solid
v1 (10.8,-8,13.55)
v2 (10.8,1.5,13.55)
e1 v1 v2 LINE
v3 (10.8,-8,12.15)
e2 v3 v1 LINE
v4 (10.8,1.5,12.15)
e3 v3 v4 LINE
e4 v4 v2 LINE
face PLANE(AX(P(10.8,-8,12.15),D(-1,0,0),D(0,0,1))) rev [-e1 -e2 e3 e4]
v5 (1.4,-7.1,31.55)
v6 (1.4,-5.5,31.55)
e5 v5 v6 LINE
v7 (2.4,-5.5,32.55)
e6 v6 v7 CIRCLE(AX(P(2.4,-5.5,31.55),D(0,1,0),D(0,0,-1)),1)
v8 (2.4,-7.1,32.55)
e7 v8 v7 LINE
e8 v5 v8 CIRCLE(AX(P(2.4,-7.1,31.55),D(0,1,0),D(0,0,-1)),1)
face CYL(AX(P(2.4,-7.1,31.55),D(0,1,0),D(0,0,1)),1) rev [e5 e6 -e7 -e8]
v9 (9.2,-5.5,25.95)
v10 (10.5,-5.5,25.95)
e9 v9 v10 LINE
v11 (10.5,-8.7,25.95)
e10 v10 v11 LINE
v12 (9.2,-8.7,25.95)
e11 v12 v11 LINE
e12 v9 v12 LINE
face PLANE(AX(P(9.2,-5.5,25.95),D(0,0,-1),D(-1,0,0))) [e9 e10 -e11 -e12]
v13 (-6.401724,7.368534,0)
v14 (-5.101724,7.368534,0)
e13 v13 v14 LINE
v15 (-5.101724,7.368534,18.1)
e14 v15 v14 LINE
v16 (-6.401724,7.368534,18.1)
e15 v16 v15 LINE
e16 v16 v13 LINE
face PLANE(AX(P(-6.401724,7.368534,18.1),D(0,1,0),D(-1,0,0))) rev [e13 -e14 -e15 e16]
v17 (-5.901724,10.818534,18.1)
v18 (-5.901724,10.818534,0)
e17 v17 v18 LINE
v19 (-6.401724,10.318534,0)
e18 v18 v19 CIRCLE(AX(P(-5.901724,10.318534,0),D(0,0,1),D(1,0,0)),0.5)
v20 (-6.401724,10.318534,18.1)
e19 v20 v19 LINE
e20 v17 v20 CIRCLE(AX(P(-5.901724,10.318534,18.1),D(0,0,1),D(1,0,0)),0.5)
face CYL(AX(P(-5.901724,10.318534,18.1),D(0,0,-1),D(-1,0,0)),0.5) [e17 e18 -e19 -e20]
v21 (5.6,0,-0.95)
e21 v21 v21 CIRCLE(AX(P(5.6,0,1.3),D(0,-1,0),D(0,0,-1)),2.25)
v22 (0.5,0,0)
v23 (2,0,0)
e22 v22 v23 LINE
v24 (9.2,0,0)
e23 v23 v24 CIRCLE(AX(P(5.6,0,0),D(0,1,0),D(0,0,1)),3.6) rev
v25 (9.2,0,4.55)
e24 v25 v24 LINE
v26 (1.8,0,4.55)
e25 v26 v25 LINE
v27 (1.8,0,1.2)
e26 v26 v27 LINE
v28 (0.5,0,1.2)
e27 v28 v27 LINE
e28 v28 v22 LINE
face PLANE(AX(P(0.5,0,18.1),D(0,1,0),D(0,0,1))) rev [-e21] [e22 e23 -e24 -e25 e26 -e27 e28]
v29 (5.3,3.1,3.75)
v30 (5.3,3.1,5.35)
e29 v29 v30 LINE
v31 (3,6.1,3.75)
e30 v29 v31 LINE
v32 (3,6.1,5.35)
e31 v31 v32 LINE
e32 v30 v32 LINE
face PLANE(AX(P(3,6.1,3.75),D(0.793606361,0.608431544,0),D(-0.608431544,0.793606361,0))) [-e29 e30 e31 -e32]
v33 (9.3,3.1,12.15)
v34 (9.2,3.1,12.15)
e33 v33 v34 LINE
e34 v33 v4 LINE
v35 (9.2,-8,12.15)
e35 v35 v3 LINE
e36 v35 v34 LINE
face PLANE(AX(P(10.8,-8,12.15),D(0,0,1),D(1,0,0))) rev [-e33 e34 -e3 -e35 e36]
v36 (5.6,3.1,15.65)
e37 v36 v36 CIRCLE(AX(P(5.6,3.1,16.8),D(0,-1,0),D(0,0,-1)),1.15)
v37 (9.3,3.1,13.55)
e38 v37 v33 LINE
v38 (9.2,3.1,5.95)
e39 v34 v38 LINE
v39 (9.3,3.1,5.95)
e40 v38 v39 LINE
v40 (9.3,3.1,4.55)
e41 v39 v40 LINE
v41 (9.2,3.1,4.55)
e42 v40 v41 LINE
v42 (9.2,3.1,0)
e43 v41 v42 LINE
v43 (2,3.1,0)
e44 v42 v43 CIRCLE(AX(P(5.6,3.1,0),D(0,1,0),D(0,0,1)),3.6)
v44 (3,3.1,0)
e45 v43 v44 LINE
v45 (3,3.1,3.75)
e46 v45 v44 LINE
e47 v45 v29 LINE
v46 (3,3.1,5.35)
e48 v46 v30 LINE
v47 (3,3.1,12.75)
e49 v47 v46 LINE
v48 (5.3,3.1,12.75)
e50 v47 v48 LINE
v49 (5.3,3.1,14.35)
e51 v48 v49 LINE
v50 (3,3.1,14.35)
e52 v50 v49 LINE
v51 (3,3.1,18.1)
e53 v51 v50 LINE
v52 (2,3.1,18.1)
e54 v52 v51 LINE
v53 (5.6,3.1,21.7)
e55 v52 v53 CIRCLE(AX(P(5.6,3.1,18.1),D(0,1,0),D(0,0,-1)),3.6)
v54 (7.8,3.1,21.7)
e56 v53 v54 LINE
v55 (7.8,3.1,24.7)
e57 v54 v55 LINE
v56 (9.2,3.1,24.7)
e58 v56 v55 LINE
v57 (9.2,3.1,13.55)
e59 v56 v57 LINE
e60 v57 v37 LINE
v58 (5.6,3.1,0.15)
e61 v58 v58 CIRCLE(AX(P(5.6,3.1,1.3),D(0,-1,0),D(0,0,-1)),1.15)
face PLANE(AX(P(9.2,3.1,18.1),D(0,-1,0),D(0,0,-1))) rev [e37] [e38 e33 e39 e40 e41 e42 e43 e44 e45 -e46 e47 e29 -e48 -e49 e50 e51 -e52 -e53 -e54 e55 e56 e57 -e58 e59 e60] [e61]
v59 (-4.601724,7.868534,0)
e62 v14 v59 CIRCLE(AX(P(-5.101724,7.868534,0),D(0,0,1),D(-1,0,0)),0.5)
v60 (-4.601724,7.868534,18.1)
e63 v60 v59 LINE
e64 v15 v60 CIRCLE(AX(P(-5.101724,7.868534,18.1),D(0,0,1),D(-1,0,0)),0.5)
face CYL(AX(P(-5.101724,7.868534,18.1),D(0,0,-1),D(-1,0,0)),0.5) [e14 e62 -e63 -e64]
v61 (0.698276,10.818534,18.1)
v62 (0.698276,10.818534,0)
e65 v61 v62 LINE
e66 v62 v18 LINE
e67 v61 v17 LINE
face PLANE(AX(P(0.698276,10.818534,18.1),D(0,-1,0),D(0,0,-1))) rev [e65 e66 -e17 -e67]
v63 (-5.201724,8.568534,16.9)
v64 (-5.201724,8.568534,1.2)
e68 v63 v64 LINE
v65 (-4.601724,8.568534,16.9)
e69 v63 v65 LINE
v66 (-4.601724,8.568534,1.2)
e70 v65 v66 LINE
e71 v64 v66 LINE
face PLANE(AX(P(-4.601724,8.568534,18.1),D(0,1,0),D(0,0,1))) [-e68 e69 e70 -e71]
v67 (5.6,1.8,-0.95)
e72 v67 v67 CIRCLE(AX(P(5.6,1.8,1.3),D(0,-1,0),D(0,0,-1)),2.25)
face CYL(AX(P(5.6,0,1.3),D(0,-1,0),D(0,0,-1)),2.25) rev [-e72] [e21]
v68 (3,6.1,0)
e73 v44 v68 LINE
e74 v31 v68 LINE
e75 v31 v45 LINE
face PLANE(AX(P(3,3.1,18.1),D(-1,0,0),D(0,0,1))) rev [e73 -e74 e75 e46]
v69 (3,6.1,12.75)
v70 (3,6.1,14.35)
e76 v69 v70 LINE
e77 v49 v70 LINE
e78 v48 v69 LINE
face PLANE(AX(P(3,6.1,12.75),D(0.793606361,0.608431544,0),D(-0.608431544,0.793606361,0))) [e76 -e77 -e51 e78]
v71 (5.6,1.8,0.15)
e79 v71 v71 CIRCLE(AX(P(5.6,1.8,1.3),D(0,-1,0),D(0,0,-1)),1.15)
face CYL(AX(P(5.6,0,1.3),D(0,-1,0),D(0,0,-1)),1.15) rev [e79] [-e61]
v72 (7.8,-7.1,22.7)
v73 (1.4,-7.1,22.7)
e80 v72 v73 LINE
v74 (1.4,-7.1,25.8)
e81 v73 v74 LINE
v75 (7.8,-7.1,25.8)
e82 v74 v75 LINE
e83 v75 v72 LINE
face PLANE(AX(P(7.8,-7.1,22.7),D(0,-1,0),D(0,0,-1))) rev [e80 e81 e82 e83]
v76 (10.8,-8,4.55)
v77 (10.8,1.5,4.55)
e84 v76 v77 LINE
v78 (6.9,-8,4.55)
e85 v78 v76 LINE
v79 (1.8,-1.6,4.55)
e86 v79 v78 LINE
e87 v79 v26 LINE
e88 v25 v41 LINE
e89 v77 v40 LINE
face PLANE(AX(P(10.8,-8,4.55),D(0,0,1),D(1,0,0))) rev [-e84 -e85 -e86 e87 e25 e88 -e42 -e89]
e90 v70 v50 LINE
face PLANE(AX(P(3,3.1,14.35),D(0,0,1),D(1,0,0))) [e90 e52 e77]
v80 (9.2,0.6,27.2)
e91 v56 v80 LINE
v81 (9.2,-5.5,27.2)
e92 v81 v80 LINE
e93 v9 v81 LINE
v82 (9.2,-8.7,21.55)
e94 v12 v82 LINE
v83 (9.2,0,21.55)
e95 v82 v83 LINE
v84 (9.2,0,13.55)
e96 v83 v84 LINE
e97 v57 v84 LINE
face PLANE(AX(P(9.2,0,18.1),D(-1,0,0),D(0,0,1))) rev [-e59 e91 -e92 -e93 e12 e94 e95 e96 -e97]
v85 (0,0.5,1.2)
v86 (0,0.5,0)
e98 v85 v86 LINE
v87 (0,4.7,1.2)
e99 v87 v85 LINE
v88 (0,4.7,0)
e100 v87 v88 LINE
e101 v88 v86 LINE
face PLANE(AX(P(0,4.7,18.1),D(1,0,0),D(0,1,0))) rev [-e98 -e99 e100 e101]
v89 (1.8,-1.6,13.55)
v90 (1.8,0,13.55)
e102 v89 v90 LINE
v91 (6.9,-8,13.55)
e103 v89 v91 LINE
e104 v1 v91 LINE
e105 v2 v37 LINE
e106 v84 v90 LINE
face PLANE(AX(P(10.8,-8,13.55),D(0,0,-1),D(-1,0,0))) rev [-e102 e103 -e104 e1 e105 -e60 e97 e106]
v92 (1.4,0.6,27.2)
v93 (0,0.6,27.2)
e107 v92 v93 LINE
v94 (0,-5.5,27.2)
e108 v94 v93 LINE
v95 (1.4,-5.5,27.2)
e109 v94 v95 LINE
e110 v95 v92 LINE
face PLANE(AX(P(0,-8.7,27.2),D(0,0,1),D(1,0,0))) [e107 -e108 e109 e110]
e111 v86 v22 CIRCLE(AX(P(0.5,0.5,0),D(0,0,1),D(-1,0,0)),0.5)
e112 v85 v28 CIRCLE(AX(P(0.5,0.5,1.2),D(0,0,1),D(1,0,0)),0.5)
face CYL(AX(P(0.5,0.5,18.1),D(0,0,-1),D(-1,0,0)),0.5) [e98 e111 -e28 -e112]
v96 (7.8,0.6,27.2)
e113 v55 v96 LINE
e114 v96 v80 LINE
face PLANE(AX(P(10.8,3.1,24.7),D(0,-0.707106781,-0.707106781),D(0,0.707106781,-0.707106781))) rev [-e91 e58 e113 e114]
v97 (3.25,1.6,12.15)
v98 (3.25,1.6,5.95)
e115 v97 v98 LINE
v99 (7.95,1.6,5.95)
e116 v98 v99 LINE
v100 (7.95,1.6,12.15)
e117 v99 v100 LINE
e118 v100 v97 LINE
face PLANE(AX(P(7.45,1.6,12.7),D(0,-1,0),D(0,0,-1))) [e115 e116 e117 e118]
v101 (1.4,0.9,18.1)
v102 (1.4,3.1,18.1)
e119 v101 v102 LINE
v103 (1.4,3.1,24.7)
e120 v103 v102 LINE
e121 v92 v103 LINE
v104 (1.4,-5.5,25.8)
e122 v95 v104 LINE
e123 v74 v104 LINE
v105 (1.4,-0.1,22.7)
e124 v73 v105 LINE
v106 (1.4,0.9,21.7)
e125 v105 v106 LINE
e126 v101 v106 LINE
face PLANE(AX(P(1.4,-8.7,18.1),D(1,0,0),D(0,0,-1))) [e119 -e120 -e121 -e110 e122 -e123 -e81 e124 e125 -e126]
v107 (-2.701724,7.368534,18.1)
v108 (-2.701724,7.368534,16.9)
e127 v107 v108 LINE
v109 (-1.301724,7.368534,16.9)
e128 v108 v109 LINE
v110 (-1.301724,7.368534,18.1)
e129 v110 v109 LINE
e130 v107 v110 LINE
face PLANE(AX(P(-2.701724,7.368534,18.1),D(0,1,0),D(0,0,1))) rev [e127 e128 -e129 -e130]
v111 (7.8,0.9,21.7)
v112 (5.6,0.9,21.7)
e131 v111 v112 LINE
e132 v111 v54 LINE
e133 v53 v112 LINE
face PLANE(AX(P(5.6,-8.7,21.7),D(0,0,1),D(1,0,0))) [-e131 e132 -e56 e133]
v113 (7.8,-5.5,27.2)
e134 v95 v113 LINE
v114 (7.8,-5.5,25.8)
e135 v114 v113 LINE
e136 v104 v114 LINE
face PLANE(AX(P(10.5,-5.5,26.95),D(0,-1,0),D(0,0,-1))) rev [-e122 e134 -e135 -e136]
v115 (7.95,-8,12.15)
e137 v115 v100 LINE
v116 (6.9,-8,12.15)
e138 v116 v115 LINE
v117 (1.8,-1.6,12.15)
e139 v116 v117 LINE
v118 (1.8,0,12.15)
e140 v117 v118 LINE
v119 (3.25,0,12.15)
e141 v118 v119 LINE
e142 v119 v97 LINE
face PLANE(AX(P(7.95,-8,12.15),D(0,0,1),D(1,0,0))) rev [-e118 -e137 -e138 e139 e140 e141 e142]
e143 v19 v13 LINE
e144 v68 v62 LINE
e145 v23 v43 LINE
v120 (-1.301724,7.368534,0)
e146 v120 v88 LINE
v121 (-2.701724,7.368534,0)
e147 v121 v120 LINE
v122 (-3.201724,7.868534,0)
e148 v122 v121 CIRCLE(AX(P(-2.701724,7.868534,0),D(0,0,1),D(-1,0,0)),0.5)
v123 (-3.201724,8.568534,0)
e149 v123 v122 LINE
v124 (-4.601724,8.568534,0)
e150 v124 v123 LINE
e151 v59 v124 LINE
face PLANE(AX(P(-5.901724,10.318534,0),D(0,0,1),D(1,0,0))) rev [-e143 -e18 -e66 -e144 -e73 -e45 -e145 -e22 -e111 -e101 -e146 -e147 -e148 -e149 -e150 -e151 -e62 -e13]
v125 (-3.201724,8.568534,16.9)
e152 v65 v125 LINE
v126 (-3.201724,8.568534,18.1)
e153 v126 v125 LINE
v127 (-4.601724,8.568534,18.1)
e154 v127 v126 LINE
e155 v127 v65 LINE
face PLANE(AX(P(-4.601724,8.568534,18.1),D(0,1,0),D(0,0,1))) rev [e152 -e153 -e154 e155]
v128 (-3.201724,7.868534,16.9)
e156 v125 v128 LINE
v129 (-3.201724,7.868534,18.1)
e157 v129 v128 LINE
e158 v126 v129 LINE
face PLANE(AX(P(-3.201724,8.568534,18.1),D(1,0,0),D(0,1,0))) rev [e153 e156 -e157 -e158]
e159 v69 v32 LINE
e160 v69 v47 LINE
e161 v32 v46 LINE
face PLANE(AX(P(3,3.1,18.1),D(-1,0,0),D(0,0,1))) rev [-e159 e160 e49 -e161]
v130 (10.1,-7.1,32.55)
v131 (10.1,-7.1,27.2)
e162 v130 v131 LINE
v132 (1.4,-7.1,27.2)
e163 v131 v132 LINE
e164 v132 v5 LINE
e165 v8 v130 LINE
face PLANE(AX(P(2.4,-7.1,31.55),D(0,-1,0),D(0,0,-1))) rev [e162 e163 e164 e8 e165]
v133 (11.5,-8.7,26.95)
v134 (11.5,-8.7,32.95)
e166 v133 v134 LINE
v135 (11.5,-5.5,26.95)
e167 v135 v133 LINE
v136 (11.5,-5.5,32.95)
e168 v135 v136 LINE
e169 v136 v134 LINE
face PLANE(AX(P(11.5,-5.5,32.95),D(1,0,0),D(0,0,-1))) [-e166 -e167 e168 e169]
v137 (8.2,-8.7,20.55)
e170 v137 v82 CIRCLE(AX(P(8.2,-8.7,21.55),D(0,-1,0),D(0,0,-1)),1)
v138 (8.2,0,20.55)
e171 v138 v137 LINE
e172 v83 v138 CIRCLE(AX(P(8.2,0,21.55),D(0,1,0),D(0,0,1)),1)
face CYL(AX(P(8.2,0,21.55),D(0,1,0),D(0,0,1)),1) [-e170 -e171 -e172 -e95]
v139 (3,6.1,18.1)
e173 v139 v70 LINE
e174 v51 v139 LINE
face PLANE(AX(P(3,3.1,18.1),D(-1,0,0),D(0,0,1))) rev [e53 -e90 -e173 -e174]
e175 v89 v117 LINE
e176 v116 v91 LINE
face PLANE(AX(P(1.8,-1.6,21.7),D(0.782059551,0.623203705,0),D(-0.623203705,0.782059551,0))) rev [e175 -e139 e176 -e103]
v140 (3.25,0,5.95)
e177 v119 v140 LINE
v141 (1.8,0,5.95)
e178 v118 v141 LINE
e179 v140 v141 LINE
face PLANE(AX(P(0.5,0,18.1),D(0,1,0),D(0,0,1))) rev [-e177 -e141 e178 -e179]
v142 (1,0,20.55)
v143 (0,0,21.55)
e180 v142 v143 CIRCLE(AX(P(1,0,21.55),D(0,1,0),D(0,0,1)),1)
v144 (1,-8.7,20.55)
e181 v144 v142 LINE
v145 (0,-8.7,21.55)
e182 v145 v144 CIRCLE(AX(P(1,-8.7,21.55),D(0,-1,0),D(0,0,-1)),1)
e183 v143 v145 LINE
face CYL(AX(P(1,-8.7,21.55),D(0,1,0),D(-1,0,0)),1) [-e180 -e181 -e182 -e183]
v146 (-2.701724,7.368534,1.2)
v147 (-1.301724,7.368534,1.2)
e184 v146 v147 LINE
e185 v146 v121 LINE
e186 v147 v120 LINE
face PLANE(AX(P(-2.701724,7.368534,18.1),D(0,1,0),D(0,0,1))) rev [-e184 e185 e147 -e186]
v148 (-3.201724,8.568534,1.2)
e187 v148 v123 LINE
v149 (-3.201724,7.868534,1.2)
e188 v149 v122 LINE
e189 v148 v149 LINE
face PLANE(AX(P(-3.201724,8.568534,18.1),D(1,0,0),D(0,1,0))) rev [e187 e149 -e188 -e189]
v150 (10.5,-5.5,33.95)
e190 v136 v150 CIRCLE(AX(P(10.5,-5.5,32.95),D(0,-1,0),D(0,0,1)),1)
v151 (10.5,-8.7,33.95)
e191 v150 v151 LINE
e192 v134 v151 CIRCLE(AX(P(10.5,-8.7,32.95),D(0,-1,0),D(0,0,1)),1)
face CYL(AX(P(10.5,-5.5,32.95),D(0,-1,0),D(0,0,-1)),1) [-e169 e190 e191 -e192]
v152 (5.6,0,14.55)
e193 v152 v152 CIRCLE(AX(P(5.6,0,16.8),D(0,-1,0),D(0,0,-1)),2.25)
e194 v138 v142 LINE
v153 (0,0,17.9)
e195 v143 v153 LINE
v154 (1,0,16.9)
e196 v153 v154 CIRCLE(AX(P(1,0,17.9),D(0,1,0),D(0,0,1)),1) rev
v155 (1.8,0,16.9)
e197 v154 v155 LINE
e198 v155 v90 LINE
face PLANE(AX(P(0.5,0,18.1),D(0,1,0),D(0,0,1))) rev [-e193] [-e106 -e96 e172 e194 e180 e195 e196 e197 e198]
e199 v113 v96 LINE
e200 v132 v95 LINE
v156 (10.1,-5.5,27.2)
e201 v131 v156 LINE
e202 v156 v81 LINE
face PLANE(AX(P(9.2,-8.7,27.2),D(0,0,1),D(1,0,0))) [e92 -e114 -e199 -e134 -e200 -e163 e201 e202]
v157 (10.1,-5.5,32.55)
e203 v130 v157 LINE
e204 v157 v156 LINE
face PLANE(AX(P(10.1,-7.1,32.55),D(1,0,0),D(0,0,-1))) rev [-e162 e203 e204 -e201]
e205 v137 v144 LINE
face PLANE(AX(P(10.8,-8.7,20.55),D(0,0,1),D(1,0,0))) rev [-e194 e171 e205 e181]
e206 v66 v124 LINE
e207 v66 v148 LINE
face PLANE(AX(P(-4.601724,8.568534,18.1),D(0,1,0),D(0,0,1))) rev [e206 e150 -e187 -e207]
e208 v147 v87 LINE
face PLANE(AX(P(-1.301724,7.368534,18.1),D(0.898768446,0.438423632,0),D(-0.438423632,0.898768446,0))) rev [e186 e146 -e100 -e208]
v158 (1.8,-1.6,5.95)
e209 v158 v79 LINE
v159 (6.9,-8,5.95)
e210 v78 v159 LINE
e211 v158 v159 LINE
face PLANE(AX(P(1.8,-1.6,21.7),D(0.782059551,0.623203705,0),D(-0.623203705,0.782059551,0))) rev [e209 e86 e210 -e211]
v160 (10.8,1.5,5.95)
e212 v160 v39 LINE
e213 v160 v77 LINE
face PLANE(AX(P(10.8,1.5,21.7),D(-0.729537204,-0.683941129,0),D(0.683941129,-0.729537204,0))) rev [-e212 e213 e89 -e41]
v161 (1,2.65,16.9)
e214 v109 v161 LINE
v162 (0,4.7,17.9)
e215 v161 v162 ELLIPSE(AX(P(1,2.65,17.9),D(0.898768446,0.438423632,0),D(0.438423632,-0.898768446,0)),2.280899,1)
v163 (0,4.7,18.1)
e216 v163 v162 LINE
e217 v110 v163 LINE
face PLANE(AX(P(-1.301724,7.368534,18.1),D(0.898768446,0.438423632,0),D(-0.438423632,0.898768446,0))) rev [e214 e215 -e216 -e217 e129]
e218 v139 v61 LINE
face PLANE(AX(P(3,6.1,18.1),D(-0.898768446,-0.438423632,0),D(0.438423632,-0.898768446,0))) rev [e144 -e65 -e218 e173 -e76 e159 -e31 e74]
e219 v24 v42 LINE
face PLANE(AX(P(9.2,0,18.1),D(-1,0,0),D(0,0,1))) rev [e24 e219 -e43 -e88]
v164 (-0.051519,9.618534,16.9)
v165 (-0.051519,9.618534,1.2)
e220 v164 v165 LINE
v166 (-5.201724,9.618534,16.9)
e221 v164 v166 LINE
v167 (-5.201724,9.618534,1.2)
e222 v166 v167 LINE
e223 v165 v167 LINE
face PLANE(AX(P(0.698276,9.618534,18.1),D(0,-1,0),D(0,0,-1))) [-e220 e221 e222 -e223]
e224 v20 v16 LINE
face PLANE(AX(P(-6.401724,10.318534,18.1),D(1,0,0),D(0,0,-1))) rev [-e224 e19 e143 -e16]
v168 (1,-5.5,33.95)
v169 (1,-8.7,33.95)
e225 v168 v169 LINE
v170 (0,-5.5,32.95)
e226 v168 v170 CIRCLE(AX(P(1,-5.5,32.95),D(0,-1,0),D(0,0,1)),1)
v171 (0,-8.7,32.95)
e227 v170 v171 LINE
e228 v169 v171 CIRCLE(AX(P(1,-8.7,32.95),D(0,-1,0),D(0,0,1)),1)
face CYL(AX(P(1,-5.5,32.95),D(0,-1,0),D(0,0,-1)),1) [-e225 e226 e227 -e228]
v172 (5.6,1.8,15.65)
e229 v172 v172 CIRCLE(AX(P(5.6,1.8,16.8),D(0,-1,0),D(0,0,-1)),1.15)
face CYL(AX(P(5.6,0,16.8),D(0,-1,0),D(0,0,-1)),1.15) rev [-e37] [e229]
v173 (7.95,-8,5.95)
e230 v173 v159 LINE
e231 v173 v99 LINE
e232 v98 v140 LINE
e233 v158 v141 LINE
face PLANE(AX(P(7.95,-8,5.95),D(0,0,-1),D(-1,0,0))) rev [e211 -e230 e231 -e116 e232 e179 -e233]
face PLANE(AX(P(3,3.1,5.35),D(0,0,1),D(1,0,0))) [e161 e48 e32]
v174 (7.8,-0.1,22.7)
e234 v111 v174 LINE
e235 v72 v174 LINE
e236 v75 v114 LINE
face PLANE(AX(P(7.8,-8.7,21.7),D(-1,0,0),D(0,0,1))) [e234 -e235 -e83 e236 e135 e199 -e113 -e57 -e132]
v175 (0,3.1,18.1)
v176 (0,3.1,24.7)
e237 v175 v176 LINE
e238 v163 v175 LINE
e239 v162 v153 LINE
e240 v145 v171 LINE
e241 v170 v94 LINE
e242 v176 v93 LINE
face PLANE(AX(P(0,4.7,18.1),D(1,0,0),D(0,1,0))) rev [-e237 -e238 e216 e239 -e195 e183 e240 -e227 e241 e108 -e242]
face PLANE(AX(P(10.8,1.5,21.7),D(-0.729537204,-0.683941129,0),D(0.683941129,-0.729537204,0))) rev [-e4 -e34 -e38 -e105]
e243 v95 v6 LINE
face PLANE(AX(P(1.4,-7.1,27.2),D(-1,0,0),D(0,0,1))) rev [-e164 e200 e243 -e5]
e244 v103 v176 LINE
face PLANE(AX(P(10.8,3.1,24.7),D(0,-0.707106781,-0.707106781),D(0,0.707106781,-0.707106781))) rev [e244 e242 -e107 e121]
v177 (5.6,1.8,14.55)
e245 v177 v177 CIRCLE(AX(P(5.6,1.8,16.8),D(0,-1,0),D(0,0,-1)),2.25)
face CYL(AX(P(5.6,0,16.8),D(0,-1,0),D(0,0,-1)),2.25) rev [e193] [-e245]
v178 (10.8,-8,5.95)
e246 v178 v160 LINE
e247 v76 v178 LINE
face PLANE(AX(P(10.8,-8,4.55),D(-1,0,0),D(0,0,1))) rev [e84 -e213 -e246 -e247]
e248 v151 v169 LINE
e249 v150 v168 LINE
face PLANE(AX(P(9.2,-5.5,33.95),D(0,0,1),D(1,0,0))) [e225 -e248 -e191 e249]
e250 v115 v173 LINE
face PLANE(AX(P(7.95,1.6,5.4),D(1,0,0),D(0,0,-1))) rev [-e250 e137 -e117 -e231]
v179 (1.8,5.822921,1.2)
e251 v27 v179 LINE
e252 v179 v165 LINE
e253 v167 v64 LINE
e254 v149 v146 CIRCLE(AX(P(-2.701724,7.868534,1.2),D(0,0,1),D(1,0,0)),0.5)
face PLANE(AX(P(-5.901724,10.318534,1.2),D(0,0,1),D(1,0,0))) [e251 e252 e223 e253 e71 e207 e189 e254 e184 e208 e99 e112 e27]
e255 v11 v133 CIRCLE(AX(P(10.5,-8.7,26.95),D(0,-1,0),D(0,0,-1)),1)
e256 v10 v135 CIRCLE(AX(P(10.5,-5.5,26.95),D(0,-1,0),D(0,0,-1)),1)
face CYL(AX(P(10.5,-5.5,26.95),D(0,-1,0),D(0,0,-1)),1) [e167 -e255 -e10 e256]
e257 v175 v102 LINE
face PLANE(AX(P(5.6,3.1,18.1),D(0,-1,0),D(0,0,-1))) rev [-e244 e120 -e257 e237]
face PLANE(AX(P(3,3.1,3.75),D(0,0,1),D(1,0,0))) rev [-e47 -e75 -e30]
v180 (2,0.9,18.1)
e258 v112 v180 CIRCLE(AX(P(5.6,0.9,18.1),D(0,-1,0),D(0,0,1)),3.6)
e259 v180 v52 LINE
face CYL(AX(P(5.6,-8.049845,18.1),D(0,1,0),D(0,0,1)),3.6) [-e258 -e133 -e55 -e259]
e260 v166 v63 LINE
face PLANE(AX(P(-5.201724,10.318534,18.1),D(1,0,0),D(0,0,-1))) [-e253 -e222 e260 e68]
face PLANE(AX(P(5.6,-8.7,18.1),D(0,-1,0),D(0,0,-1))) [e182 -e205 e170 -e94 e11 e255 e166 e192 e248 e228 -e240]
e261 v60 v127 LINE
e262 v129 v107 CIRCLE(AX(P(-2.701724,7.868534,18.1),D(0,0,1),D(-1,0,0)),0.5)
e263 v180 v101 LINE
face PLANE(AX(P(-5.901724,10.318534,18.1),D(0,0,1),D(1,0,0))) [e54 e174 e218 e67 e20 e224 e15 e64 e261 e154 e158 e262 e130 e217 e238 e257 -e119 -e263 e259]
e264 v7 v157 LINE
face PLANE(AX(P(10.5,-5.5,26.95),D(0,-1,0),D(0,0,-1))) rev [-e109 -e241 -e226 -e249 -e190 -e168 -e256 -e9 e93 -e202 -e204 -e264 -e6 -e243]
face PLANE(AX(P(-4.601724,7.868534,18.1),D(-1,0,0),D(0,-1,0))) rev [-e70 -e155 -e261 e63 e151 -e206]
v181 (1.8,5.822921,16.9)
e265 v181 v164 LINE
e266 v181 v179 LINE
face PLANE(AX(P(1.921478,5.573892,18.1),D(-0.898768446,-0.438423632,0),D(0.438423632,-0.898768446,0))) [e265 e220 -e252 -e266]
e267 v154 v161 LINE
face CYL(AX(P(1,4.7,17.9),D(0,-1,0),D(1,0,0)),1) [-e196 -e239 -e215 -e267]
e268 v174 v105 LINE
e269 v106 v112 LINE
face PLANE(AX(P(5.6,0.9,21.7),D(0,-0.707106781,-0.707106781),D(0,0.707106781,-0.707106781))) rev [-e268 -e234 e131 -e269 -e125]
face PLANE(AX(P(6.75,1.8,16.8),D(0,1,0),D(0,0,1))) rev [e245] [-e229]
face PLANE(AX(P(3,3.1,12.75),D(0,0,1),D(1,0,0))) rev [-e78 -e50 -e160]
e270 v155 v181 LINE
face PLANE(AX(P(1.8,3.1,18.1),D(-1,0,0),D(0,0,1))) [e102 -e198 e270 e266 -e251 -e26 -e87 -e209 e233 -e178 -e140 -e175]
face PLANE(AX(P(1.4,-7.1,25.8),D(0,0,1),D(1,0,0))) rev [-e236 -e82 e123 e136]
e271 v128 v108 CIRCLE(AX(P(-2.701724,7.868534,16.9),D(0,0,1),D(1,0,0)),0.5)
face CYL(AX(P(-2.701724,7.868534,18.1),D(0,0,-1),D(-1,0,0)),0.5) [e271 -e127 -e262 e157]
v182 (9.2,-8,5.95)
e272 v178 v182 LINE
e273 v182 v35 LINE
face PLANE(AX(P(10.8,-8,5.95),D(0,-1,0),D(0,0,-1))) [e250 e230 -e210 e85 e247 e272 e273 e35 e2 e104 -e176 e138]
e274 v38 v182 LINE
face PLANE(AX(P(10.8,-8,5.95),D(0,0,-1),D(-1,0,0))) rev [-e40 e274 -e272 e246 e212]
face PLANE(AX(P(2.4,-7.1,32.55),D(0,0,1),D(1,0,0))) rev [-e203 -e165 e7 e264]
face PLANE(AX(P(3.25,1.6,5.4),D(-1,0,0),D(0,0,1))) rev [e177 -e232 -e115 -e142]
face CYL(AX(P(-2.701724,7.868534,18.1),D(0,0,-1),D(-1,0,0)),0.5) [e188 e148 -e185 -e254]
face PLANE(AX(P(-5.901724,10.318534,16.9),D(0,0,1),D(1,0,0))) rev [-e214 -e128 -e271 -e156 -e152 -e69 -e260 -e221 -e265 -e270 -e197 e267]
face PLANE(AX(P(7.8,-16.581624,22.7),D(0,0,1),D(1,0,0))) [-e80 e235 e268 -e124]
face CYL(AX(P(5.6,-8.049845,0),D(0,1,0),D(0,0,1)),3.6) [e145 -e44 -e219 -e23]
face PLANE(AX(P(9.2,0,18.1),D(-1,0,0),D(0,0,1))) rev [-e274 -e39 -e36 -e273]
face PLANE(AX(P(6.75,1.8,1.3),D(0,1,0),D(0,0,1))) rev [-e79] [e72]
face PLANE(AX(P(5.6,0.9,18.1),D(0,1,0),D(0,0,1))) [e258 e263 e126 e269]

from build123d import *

# Parameters (mm, degrees)
EXTRUSION1_DEPTH                                  = 18.1
COQUE1_START                                      = 1.2
COQUE1_DEPTH                                      = 15.7
EXTRUSION2_DEPTH                                  = 3.1
ESQUISSE3_W                                       = 6.2
ESQUISSE3_H                                       = 18.1
EXTRUSION3_DEPTH                                  = 1.9
CHAMBRAGE_POUR_VIS_T_TE_HEXAGONALE_M2_D           = 2.3
CHAMBRAGE_POUR_VIS_T_TE_HEXAGONALE_M2_CBORE_D     = 4.5
CHAMBRAGE_POUR_VIS_T_TE_HEXAGONALE_M2_CBORE_DEPTH = 1.8
ENL_V_MAT_EXTRU_1_DEPTH                           = 1.6
EXTRUSION4_DEPTH                                  = 1.6
R_P_TITION_LIN_AIRE1_COUNT                        = 2
R_P_TITION_LIN_AIRE1_PITCH                        = 9
EXTRUSION5_DEPTH                                  = 8
EXTRUSION5_DIRECTION_2_REACH                      = 27.934
ENL_V_MAT_EXTRU_2_DEPTH                           = 23.973967556
EXTRUSION6_DEPTH                                  = 11.8
EXTRUSION7_DEPTH                                  = 9.6
CHANFREIN1_SIZE                                   = 1
ESQUISSE12_W                                      = 3.65
ESQUISSE12_H                                      = 8.7
ENL_V_MAT_EXTRU_3_DEPTH                           = 32.201293006
EXTRUSION8_DEPTH                                  = 3.2
ESQUISSE14_W                                      = 6.4
ESQUISSE14_H                                      = 3.1
ENL_V_MAT_EXTRU_4_DEPTH                           = 1.6
CONG_1_R                                          = 1
CONG_2_R                                          = 1


# Read off the part's stored shape, not the designer's step: Coque1
with BuildPart() as part:
    # Esquisse1 → Extrusion1 (new body)
    with BuildSketch(Plane.XY):
        with BuildLine():
            Line((0.5, 0), (9.2, 0))
            Line((9.2, 0), (9.2, 3.1))
            Line((9.2, 3.1), (3, 3.1))
            Line((3, 3.1), (3, 6.1))
            Line((3, 6.1), (0.698275932, 10.81853434))
            Line((0.698275932, 10.81853434), (-5.901724068, 10.81853434))
            ThreePointArc((-5.901724068, 10.81853434), (-6.255277459, 10.67208773), (-6.401724068, 10.31853434))
            Line((-6.401724068, 10.31853434), (-6.401724068, 7.36853434))
            Line((-6.401724068, 7.36853434), (-5.101724068, 7.36853434))
            ThreePointArc((-5.101724068, 7.36853434), (-4.748170678, 7.514980949), (-4.601724068, 7.86853434))
            Line((-4.601724068, 7.86853434), (-4.601724068, 8.56853434))
            Line((-4.601724068, 8.56853434), (-3.201724068, 8.56853434))
            Line((-3.201724068, 8.56853434), (-3.201724068, 7.86853434))
            ThreePointArc((-3.201724068, 7.86853434), (-3.055277459, 7.514980949), (-2.701724068, 7.36853434))
            Line((-2.701724068, 7.36853434), (-1.301724068, 7.36853434))
            Line((-1.301724068, 7.36853434), (0, 4.7))
            Line((0, 4.7), (0, 0.5))
            ThreePointArc((0, 0.5), (0.146446609, 0.146446609), (0.5, 0))
        make_face()
    extrude(amount=EXTRUSION1_DEPTH)

    # Coque1 outline → Coque1 (cut)
    with BuildSketch(Plane.XY.offset(COQUE1_START)):
        with BuildLine():
            Line((-5.201724068, 8.56853434), (-3.201724068, 8.56853434))
            Line((-3.201724068, 8.56853434), (-3.201724068, 7.86853434))
            ThreePointArc((-3.201724068, 7.86853434), (-3.055277459, 7.514980949), (-2.701724068, 7.36853434))
            Line((-2.701724068, 7.36853434), (-1.301724068, 7.36853434))
            Line((-1.301724068, 7.36853434), (0, 4.7))
            Line((0, 4.7), (0, 0.5))
            ThreePointArc((0, 0.5), (0.146446609, 0.146446609), (0.5, 0))
            Line((0.5, 0), (8, 0))
            Line((8, 0), (8, 1.9))
            Line((8, 1.9), (1.8, 1.9))
            Line((1.8, 1.9), (1.8, 5.822921265))
            Line((1.8, 5.822921265), (-0.051518573, 9.61853434))
            Line((-0.051518573, 9.61853434), (-5.201724068, 9.61853434))
            Line((-5.201724068, 9.61853434), (-5.201724068, 8.56853434))
        make_face()
    extrude(amount=COQUE1_DEPTH, mode=Mode.SUBTRACT)

    # Esquisse2 → Extrusion2 (add)
    with BuildSketch(Plane(origin=(0, 3.1, 0), x_dir=(-1, 0, 0), z_dir=(0, 1, 0))):
        with BuildLine():
            Line((-9.2, 0), (-2, 0))
            ThreePointArc((-2, 0), (-5.6, -3.6), (-9.2, 0))
        make_face()
        with BuildLine():
            Line((-9.2, 18.1), (-2, 18.1))
            ThreePointArc((-2, 18.1), (-5.6, 21.7), (-9.2, 18.1))
        make_face()
    extrude(amount=-EXTRUSION2_DEPTH)

    # Esquisse3 → Extrusion3 (add)
    with BuildSketch(Plane.XZ):
        with Locations((4.9, 9.05)):
            Rectangle(ESQUISSE3_W, ESQUISSE3_H)
    extrude(amount=-EXTRUSION3_DEPTH)

    # Chambrage pour vis à tête hexagonale M2.51 (through all)
    with Locations(Plane.XZ):
        with Locations((5.6, 1.3), (5.6, 16.8)):
            CounterBoreHole(CHAMBRAGE_POUR_VIS_T_TE_HEXAGONALE_M2_D / 2, CHAMBRAGE_POUR_VIS_T_TE_HEXAGONALE_M2_CBORE_D / 2, CHAMBRAGE_POUR_VIS_T_TE_HEXAGONALE_M2_CBORE_DEPTH)

    # Esquisse6 → Enlèv. mat.-Extru.1 (cut)
    with BuildSketch(Plane.XZ):
        with BuildLine():
            Line((3.75, 4.9), (7.45, 4.9))
            ThreePointArc((7.45, 4.9), (7.803553391, 5.046446609), (7.95, 5.4))
            Line((7.95, 5.4), (7.95, 12.7))
            ThreePointArc((7.95, 12.7), (7.803553391, 13.053553391), (7.45, 13.2))
            Line((7.45, 13.2), (3.75, 13.2))
            ThreePointArc((3.75, 13.2), (3.396446609, 13.053553391), (3.25, 12.7))
            Line((3.25, 12.7), (3.25, 5.4))
            ThreePointArc((3.25, 5.4), (3.396446609, 5.046446609), (3.75, 4.9))
        make_face()
    extrude(amount=-ENL_V_MAT_EXTRU_1_DEPTH, mode=Mode.SUBTRACT)

    # Esquisse7 → Extrusion4 (add)
    with BuildSketch(Plane.XY.offset(14.35)):
        Polygon((3, 6.1), (5.3, 3.1), (3, 3.1), align=None)
    extrusion4 = extrude(amount=-EXTRUSION4_DEPTH)

    # Répétition linéaire1: Extrusion4 ×2
    with Locations(*[(0, 0, -i * R_P_TITION_LIN_AIRE1_PITCH) for i in range(1, R_P_TITION_LIN_AIRE1_COUNT)]):
        add(extrusion4)

    # Esquisse8 → Extrusion5 (add)
    with BuildSketch(Plane.XZ):
        Polygon((10.8, 4.55), (1.8, 4.55), (1.8, 5.95), (7.95, 5.95), (7.95, 12.15), (1.8, 12.15), (1.8, 13.55), (10.8, 13.55), (10.8, 12.15), (9.2, 12.15), (9.2, 5.95), (10.8, 5.95), align=None)
    extrude(amount=EXTRUSION5_DEPTH)

    # Extrusion5 direction 2: up to this face of the body (flat: up to its plane)
    extrusion5_direction_2_end = Plane(part.part.faces().sort_by_distance((6.086516905, 3.1, 9.05))[0])
    # Esquisse8 → Extrusion5 direction 2 (add, up to the picked face)
    with BuildSketch(Plane.XZ, mode=Mode.PRIVATE) as extrusion5_direction_2_sk1:
        Polygon((10.8, 4.55), (1.8, 4.55), (1.8, 5.95), (7.95, 5.95), (7.95, 12.15), (1.8, 12.15), (1.8, 13.55), (10.8, 13.55), (10.8, 12.15), (9.2, 12.15), (9.2, 5.95), (10.8, 5.95), align=None)
    extrusion5_direction_2_tool1 = split(extrude(extrusion5_direction_2_sk1.sketch, amount=-EXTRUSION5_DIRECTION_2_REACH, mode=Mode.PRIVATE), bisect_by=extrusion5_direction_2_end, keep=Keep.BOTH, mode=Mode.PRIVATE)
    add(extrusion5_direction_2_tool1.solids().sort_by(Axis((6.3, 0, 4.677279), (0, 1, 0)))[0])

    # Esquisse9 → Enlèv. mat.-Extru.2 (cut, through all)
    with BuildSketch(Plane(origin=(0, 0, 4.55), x_dir=(-1, 0, 0), z_dir=(0, 0, -1))):
        Polygon((-6.9, -8), (-1.8, -8), (-1.8, -1.6), align=None)
        Polygon((-10.8, 3.1), (-10.8, 1.5), (-9.3, 3.1), align=None)
    extrude(amount=-ENL_V_MAT_EXTRU_2_DEPTH, mode=Mode.SUBTRACT)

    # Esquisse10 → Extrusion6 (add)
    with BuildSketch(Plane(origin=(0, 3.1, 0), x_dir=(-1, 0, 0), z_dir=(0, 1, 0))):
        with BuildLine():
            Line((-9.2, 17.467725461), (-9.2, 27.2))
            Line((-9.2, 27.2), (-7.8, 27.2))
            Line((-7.8, 27.2), (-7.8, 21.7))
            Line((-7.8, 21.7), (-5.6, 21.7))
            ThreePointArc((-5.6, 21.7), (-3.054415588, 20.645584412), (-2, 18.1))
            Line((-2, 18.1), (-1.4, 18.1))
            Line((-1.4, 18.1), (-1.4, 27.2))
            Line((-1.4, 27.2), (0, 27.2))
            Line((0, 27.2), (0, 16.9))
            Line((0, 16.9), (-1.097371231, 16.9))
            Line((-1.097371231, 16.9), (-5.6, 19.545108536))
            Line((-5.6, 19.545108536), (-9.2, 17.467725461))
        make_face()
    extrude(amount=-EXTRUSION6_DEPTH)

    # Esquisse11 → Extrusion7 (add)
    with BuildSketch(Plane(origin=(0, 0.9, 0), x_dir=(-1, 0, 0), z_dir=(0, 1, 0))):
        with BuildLine():
            Line((-1.4, 22.7), (-1.4, 18.1))
            Line((-1.4, 18.1), (-2, 18.1))
            ThreePointArc((-2, 18.1), (-3.054415588, 20.645584412), (-5.6, 21.7))
            Line((-5.6, 21.7), (-7.8, 21.7))
            Line((-7.8, 21.7), (-7.8, 22.7))
            Line((-7.8, 22.7), (-1.4, 22.7))
        make_face()
    extrude(amount=-EXTRUSION7_DEPTH)

    # Chanfrein1
    chanfrein1_edges = [part.edges().sort_by_distance(p)[0] for p in [
        (4.6, 0.9, 22.7),
    ]]
    chamfer(chanfrein1_edges, length=CHANFREIN1_SIZE - 0.0001)  # a hair under: the kernel refuses the full size

    # Esquisse12 → Enlèv. mat.-Extru.3 (cut, through all)
    with BuildSketch(Plane.ZY):
        with Locations((18.725, -4.35)):
            Rectangle(ESQUISSE12_W, ESQUISSE12_H)
        Polygon((27.2, 3.1), (24.7, 3.1), (27.2, 0.6), align=None)
    extrude(amount=-ENL_V_MAT_EXTRU_3_DEPTH, mode=Mode.SUBTRACT)

    # Esquisse13 → Extrusion8 (add)
    with BuildSketch(Plane.XZ.offset(8.7)):
        with BuildLine():
            Line((9.2, 20.55), (0, 20.55))
            Line((0, 20.55), (0, 32.95))
            ThreePointArc((0, 32.95), (0.292893219, 33.657106781), (1, 33.95))
            Line((1, 33.95), (9.2, 33.95))
            Line((9.2, 33.95), (10.5, 33.95))
            ThreePointArc((10.5, 33.95), (11.207106781, 33.657106781), (11.5, 32.95))
            Line((11.5, 32.95), (11.5, 26.95))
            ThreePointArc((11.5, 26.95), (11.207106781, 26.242893219), (10.5, 25.95))
            Line((10.5, 25.95), (9.2, 25.95))
            Line((9.2, 25.95), (9.2, 20.55))
        make_face()
    extrude(amount=-EXTRUSION8_DEPTH)

    # Esquisse14 → Enlèv. mat.-Extru.4 (cut)
    with BuildSketch(Plane(origin=(0, -5.5, 0), x_dir=(-1, 0, 0), z_dir=(0, 1, 0))):
        with BuildLine():
            Line((-10.1, 27.2), (-1.4, 27.2))
            Line((-1.4, 27.2), (-1.4, 31.55))
            ThreePointArc((-1.4, 31.55), (-1.692893219, 32.257106781), (-2.4, 32.55))
            Line((-2.4, 32.55), (-10.1, 32.55))
            Line((-10.1, 32.55), (-10.1, 27.2))
        make_face()
        with Locations((-4.6, 24.25)):
            Rectangle(ESQUISSE14_W, ESQUISSE14_H)
    extrude(amount=-ENL_V_MAT_EXTRU_4_DEPTH, mode=Mode.SUBTRACT)

    # Congé1
    cong_1_edges = [part.edges().sort_by_distance(p)[0] for p in [
        (9.2, -4.35, 20.55),
        (0, -4.35, 20.55),
    ]]
    fillet(cong_1_edges, radius=CONG_1_R)

    # Congé2
    cong_2_edges = [part.edges().sort_by_distance(p)[0] for p in [
        (0, 2.35, 16.9),
    ]]
    fillet(cong_2_edges, radius=CONG_2_R)


solid = part.part
